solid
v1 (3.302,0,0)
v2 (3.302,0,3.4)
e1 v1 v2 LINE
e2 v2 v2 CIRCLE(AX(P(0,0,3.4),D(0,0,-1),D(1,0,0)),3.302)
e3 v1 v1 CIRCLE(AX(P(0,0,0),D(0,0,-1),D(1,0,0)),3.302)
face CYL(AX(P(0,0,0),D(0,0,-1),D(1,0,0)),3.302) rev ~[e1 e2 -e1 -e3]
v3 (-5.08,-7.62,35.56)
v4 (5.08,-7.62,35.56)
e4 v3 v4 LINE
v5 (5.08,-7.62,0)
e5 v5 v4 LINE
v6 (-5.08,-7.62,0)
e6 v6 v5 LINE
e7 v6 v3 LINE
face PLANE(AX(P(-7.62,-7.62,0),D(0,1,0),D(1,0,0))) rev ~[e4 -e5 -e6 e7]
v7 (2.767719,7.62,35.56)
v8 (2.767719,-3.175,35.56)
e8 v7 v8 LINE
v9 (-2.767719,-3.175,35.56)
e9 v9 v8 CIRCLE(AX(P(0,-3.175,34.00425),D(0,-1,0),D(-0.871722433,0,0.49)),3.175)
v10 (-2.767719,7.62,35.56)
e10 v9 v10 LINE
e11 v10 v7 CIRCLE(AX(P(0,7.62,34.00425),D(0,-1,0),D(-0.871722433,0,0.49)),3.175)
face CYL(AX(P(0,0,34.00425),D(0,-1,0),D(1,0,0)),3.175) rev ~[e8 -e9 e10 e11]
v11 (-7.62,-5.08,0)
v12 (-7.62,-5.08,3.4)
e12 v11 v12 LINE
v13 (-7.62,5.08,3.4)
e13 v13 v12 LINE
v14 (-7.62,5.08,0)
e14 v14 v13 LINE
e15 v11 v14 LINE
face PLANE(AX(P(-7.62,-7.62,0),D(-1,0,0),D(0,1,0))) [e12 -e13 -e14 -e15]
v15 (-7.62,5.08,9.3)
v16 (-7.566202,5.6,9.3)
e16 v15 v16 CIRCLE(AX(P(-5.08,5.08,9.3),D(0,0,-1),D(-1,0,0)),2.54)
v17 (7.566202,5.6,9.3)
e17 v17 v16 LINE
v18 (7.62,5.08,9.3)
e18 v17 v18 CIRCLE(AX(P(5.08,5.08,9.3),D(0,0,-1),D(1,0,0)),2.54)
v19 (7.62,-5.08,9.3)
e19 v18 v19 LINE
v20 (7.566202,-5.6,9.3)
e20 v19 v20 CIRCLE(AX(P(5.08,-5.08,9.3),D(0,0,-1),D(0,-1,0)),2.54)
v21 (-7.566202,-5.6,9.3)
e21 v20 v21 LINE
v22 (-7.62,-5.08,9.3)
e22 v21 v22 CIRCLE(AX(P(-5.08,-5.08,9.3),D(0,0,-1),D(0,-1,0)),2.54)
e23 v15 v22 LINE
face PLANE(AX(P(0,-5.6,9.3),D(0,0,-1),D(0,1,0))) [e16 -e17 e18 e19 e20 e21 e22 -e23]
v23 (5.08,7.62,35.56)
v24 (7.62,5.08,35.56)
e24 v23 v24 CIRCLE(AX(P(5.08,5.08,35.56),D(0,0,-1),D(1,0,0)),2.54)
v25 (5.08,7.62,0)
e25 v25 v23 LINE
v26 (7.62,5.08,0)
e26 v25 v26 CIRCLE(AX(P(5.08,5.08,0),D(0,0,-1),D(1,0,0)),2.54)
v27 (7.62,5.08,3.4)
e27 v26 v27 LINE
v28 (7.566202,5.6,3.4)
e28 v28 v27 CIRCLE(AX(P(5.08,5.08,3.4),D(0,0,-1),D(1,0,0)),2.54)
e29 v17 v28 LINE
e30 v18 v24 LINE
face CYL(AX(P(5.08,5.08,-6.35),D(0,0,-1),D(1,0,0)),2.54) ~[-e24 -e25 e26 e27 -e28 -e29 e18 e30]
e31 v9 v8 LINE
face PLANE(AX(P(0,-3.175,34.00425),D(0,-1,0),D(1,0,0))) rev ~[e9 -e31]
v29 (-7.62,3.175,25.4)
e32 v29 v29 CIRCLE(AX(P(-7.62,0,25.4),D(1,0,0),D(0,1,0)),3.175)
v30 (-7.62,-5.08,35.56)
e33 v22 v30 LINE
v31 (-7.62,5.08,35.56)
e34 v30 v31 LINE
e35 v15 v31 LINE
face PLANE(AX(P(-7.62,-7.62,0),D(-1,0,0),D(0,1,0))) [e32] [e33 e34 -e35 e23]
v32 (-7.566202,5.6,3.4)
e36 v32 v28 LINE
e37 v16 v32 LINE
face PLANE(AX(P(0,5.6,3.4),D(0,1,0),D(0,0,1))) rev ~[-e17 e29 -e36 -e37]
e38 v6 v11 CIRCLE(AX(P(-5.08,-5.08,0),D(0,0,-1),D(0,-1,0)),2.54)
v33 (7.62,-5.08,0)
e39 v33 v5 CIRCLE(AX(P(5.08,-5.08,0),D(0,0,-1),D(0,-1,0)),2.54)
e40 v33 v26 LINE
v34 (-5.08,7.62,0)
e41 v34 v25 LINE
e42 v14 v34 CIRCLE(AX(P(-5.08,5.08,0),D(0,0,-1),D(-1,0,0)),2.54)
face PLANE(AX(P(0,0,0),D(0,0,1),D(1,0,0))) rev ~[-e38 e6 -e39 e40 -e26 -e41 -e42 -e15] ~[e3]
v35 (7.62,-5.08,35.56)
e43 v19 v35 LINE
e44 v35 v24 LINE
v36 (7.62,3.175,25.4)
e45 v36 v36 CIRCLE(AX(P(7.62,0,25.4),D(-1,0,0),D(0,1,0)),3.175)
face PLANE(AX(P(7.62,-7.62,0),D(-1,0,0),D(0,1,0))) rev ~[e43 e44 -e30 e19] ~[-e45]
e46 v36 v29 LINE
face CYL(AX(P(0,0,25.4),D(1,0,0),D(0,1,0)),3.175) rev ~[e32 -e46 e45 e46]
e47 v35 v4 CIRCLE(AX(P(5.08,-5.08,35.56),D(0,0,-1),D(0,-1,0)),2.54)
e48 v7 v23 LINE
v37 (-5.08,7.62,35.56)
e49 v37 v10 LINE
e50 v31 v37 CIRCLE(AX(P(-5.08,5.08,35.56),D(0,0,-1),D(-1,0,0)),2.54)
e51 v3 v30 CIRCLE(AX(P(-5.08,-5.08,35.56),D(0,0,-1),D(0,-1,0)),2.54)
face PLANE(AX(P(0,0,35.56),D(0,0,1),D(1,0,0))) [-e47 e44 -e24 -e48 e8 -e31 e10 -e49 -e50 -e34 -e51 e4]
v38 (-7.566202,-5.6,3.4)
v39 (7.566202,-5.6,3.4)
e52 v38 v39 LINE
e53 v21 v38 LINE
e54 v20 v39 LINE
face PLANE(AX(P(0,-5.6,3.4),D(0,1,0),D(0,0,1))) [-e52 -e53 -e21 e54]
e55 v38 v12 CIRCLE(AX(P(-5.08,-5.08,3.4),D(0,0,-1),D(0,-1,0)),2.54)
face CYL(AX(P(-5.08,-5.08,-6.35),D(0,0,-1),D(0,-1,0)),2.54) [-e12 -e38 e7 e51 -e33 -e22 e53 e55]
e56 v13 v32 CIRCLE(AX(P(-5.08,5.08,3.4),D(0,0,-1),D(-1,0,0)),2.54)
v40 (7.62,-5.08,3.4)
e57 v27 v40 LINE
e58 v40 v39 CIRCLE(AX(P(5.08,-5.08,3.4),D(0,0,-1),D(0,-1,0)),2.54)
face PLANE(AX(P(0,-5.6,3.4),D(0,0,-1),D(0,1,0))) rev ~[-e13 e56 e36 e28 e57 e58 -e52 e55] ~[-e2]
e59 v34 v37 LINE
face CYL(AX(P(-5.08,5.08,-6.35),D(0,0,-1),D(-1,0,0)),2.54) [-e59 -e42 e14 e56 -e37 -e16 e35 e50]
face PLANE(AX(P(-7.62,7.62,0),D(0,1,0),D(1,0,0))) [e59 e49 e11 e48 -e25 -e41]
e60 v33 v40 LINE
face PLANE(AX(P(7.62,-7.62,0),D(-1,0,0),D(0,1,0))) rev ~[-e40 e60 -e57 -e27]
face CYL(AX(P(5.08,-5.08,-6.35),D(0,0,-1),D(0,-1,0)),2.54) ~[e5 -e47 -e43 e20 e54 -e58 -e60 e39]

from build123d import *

# Parameters (mm, degrees)
F0_W          = 15.24
F0_H          = 15.24
F1_DEPTH      = 35.56
F2_R          = 3.175
F3_DEPTH      = 12.7
F3_DEPTH_BACK = 3.175
F4_R          = 3.175
F4_W          = 11.2
F4_H          = 5.9
F5_DEPTH      = 12.7
F6_T1_DEPTH   = 48.26
F7_R          = 3.302
F8_DEPTH      = 6.35


# Not quite as in the source:
# - a fillet or chamfer that OpenCascade refuses, or shapes differently, is made with other operations: its cross-section is extruded or revolved along the edge and cut away or added


with BuildPart() as f1:
    # F0 (on Top) → F1 (new body)
    with BuildSketch(Plane.XY):
        Rectangle(F0_W, F0_H)
    extrude(amount=F1_DEPTH)

    # F2 (on Front) → F3 (cut, two sides)
    with BuildSketch(Plane.XZ) as f3_sk:
        with Locations((0, 34.00425)):
            Circle(F2_R)
    extrude(amount=-F3_DEPTH, mode=Mode.SUBTRACT)
    extrude(f3_sk.sketch, amount=F3_DEPTH_BACK, mode=Mode.SUBTRACT)

    # F4 (on Right) → F5 (cut, symmetric)
    with BuildSketch(Plane.YZ):
        with Locations((0, 25.4)):
            Circle(F4_R)
        with Locations((0, 6.35)):
            Rectangle(F4_W, F4_H)
    extrude(amount=F5_DEPTH, both=True, mode=Mode.SUBTRACT)

    # F6: fillet of radius 2.54 on 4 edges, made by hand

    # F6_s2 → F6_t1 (cut)
    with BuildSketch(Plane.XY.offset(-6.35)):
        with BuildLine():
            ThreePointArc((7.62, 5.08), (6.8760512242, 6.8760512242), (5.08, 7.62))
            Line((5.08, 7.62), (7.62, 7.62))
            Line((7.62, 7.62), (7.62, 5.08))
        make_face()
        with BuildLine():
            ThreePointArc((5.08, -7.62), (6.8760512242, -6.8760512242), (7.62, -5.08))
            Line((7.62, -5.08), (7.62, -7.62))
            Line((7.62, -7.62), (5.08, -7.62))
        make_face()
        with BuildLine():
            ThreePointArc((-7.62, 5.08), (-6.8760512242, 6.8760512242), (-5.08, 7.62))
            Line((-5.08, 7.62), (-7.62, 7.62))
            Line((-7.62, 7.62), (-7.62, 5.08))
        make_face()
        with BuildLine():
            ThreePointArc((-5.08, -7.62), (-6.8760512242, -6.8760512242), (-7.62, -5.08))
            Line((-7.62, -5.08), (-7.62, -7.62))
            Line((-7.62, -7.62), (-5.08, -7.62))
        make_face()
    extrude(amount=F6_T1_DEPTH, mode=Mode.SUBTRACT)

    # F7 (on face) → F8 (cut)
    with BuildSketch(Plane(origin=(0, 0, 0), x_dir=(1, 0, 0), z_dir=(0, 0, -1))):
        Circle(F7_R)
    extrude(amount=-F8_DEPTH, mode=Mode.SUBTRACT)


solid = f1.part
